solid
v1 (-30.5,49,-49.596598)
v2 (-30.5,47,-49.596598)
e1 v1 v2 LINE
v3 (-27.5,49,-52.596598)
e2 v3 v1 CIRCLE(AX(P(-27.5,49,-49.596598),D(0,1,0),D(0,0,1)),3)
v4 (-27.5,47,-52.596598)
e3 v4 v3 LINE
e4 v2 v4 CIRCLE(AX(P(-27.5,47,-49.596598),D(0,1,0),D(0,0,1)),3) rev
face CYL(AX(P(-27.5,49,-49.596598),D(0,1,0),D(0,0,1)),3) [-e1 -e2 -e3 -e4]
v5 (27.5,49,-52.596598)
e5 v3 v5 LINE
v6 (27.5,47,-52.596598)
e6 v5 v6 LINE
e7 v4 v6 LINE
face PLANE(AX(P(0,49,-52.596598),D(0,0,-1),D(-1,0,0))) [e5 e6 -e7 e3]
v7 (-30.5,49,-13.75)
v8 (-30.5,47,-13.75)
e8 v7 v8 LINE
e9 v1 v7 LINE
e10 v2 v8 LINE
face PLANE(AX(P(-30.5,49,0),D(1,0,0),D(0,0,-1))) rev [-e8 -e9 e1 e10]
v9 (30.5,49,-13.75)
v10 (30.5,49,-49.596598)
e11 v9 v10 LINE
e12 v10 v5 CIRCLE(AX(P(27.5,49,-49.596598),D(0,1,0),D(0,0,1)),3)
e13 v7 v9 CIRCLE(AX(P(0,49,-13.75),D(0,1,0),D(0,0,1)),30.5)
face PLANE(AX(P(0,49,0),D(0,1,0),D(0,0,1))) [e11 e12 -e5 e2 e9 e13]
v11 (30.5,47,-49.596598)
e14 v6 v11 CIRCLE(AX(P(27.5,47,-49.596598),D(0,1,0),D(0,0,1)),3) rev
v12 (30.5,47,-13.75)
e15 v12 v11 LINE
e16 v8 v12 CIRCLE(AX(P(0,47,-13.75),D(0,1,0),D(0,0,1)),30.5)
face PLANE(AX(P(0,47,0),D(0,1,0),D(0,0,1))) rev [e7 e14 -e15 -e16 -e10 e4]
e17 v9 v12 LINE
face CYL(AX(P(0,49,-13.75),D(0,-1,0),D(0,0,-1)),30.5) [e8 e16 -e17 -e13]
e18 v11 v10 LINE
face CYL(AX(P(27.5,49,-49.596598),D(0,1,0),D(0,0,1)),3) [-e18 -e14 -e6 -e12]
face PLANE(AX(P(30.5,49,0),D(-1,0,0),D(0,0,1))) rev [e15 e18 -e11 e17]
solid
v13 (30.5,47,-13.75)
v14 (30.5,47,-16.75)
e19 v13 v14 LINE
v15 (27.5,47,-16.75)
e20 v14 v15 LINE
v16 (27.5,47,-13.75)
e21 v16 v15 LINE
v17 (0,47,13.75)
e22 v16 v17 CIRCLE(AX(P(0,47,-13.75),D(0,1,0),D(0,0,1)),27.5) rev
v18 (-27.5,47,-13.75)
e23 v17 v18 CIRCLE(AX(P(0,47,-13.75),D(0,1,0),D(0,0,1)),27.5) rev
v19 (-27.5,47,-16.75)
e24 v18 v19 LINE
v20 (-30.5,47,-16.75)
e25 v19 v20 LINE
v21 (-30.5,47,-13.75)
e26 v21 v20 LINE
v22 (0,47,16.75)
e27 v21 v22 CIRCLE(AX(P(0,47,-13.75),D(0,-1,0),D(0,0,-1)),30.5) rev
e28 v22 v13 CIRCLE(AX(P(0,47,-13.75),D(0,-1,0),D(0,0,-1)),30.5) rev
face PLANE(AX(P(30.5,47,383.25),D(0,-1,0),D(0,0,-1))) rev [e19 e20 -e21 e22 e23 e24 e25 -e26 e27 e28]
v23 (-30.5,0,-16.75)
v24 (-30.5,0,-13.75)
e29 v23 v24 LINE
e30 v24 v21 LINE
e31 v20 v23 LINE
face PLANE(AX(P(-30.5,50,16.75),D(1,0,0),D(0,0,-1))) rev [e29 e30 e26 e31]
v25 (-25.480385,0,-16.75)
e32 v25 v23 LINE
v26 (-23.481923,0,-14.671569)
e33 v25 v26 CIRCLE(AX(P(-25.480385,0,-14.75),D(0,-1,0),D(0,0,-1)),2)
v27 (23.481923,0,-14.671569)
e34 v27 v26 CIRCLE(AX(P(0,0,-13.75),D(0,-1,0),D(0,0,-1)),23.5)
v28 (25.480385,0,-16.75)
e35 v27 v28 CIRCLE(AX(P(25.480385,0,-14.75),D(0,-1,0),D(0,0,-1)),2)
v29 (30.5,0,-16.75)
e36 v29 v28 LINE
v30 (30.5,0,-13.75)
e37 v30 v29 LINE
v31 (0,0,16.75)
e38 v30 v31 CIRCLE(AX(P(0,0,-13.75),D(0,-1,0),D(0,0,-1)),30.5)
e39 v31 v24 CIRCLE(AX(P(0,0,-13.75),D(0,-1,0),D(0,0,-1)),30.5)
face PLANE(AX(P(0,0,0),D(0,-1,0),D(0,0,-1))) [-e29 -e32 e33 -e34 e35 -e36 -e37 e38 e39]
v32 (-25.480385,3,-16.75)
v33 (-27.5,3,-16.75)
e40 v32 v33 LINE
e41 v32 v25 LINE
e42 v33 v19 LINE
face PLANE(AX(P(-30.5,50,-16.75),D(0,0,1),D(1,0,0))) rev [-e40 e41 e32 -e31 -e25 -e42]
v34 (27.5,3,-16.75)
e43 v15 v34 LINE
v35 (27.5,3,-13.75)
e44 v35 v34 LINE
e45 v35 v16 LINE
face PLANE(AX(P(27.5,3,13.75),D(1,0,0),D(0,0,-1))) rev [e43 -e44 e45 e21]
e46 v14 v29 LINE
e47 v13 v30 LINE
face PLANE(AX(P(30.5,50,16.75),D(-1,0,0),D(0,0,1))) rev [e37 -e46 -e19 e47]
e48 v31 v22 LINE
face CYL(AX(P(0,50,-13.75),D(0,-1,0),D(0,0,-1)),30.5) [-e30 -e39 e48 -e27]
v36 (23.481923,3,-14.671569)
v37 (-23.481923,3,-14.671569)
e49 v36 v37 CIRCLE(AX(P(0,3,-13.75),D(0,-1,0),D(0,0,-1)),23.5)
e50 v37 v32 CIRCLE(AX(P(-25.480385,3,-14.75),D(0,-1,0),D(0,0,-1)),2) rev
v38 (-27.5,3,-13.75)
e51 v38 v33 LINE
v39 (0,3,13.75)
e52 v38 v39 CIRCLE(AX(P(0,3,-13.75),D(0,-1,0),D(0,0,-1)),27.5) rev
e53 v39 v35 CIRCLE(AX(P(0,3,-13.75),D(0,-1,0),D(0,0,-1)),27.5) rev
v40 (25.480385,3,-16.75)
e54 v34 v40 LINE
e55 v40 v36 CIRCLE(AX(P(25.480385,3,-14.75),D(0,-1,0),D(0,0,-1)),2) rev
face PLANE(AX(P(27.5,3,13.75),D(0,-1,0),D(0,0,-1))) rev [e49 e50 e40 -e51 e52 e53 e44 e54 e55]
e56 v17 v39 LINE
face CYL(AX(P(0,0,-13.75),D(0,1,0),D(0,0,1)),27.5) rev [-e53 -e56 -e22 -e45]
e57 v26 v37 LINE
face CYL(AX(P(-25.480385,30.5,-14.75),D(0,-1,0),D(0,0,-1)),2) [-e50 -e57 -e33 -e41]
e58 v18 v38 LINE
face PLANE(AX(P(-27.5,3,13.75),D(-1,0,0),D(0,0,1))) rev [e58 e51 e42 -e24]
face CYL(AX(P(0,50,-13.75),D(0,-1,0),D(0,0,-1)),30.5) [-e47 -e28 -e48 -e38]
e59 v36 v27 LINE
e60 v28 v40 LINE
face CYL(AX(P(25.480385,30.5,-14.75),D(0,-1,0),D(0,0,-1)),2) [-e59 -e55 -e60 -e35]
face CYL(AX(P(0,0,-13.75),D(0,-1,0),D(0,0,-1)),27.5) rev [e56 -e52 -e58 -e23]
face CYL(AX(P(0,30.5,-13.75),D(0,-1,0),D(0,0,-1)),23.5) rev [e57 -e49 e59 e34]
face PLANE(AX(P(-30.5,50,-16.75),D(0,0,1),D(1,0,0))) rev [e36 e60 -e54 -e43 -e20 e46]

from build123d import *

# Parameters (mm, degrees)
SKETCH_1_W          = 61
SKETCH_1_H          = 33.5
EXTRUDE_1_DEPTH     = 50
SKETCH_2_W          = 55
SKETCH_2_H          = 44
CUT_EXTRUDE_1_DEPTH = 30.5
FILLET_3_R          = 27.5
FILLET_4_R          = 30.5
SKETCH_3_R          = 23.5
CUT_EXTRUDE_2_DEPTH = 30.5
SKETCH_5_R          = 16
CUT_EXTRUDE_4_DEPTH = 30.5
FILLET_5_R          = 4
FILLET_6_R          = 2
SKETCH_6_W          = 61
SKETCH_6_H          = 3
CUT_EXTRUDE_5_DEPTH = 400
SKETCH_8_W          = 55
SKETCH_8_H          = 3
SKETCH_8_W_2        = 3
EXTRUDE_2_DEPTH     = 2
FILLET_7_R          = 3


with BuildPart() as part:
    # 스케치1 → 보스-돌출1 (new body)
    with BuildSketch(Plane(origin=(0, 0, 0), x_dir=(1, 0, 0), z_dir=(0, 1, 0))):
        Rectangle(SKETCH_1_W, SKETCH_1_H)
    extrude(amount=EXTRUDE_1_DEPTH)

    # 스케치2 → 컷-돌출1 (cut)
    with BuildSketch(Plane(origin=(0, 0, -16.75), x_dir=(-1, 0, 0), z_dir=(0, 0, -1))):
        with Locations((0, 25)):
            Rectangle(SKETCH_2_W, SKETCH_2_H)
    extrude(amount=-CUT_EXTRUDE_1_DEPTH, mode=Mode.SUBTRACT)

    # 필렛3
    fillet_3_edges = [part.edges().sort_by_distance(p)[0] for p in [
        (-27.5, 25, 13.75),
        (27.5, 25, 13.75),
    ]]
    fillet(fillet_3_edges, radius=FILLET_3_R - 0.0001)  # a hair under: the kernel refuses the full size

    # 필렛4
    fillet_4_edges = [part.edges().sort_by_distance(p)[0] for p in [
        (-30.5, 25, 16.75),
        (30.5, 25, 16.75),
    ]]
    fillet(fillet_4_edges, radius=FILLET_4_R - 0.0001)  # a hair under: the kernel refuses the full size

    # 스케치3 → 컷-돌출2 (cut)
    with BuildSketch(Plane.XZ):
        with Locations((0, -13.75)):
            Circle(SKETCH_3_R)
    extrude(amount=-CUT_EXTRUDE_2_DEPTH, mode=Mode.SUBTRACT)

    # 스케치5 → 컷-돌출4 (cut)
    with BuildSketch(Plane.XZ.offset(-47)):
        with Locations((0, -13.75)):
            Circle(SKETCH_5_R)
    extrude(amount=-CUT_EXTRUDE_4_DEPTH, mode=Mode.SUBTRACT)

    # 필렛5
    fillet_5_edges = [part.edges().sort_by_distance(p)[0] for p in [
        (-15.716233646, 48.5, -16.75),
        (15.716233646, 48.5, -16.75),
    ]]
    fillet(fillet_5_edges, radius=FILLET_5_R)

    # 필렛6
    fillet_6_edges = [part.edges().sort_by_distance(p)[0] for p in [
        (-23.307724042, 1.5, -16.75),
        (23.307724042, 1.5, -16.75),
    ]]
    fillet(fillet_6_edges, radius=FILLET_6_R)

    # 스케치6 → 컷-돌출5 (cut)
    with BuildSketch(Plane(origin=(0, 0, -16.75), x_dir=(-1, 0, 0), z_dir=(0, 0, -1))):
        with Locations((0, 48.5)):
            Rectangle(SKETCH_6_W, SKETCH_6_H)
    extrude(amount=-CUT_EXTRUDE_5_DEPTH, mode=Mode.SUBTRACT)


with BuildPart() as body_2:
    # 스케치8 → 보스-돌출2 (new body)
    with BuildSketch(Plane(origin=(0, 47, 0), x_dir=(1, 0, 0), z_dir=(0, 1, 0))):
        with BuildLine():
            Line((27.5, 13.75), (-27.5, 13.75))
            ThreePointArc((-27.5, 13.75), (-19.445436483, -5.695436483), (0, -13.75))
            ThreePointArc((0, -13.75), (19.445436483, -5.695436483), (27.5, 13.75))
        make_face()
        with Locations((0, 15.25)):
            Rectangle(SKETCH_8_W, SKETCH_8_H)
        Polygon((-30.5, 52.596597545), (-30.5, 16.75), (-27.5, 16.75), (27.5, 16.75), (30.5, 16.75), (30.5, 52.596597545), align=None)
        with BuildLine():
            Line((-27.5, 13.75), (-30.5, 13.75))
            ThreePointArc((-30.5, 13.75), (-21.566756826, -7.816756826), (0, -16.75))
            ThreePointArc((0, -16.75), (21.566756826, -7.816756826), (30.5, 13.75))
            Line((30.5, 13.75), (27.5, 13.75))
            ThreePointArc((27.5, 13.75), (19.445436483, -5.695436483), (0, -13.75))
            ThreePointArc((0, -13.75), (-19.445436483, -5.695436483), (-27.5, 13.75))
        make_face()
        with Locations((29, 15.25)):
            Rectangle(SKETCH_8_W_2, SKETCH_8_H)
        with Locations((-29, 15.25)):
            Rectangle(SKETCH_8_W_2, SKETCH_8_H)
    extrude(amount=EXTRUDE_2_DEPTH)

    # 필렛7
    fillet_7_edges = [body_2.edges().sort_by_distance(p)[0] for p in [
        (-30.5, 48, -52.596597545),
        (30.5, 48, -52.596597545),
    ]]
    fillet(fillet_7_edges, radius=FILLET_7_R)


solid = Compound([part.part, body_2.part])
